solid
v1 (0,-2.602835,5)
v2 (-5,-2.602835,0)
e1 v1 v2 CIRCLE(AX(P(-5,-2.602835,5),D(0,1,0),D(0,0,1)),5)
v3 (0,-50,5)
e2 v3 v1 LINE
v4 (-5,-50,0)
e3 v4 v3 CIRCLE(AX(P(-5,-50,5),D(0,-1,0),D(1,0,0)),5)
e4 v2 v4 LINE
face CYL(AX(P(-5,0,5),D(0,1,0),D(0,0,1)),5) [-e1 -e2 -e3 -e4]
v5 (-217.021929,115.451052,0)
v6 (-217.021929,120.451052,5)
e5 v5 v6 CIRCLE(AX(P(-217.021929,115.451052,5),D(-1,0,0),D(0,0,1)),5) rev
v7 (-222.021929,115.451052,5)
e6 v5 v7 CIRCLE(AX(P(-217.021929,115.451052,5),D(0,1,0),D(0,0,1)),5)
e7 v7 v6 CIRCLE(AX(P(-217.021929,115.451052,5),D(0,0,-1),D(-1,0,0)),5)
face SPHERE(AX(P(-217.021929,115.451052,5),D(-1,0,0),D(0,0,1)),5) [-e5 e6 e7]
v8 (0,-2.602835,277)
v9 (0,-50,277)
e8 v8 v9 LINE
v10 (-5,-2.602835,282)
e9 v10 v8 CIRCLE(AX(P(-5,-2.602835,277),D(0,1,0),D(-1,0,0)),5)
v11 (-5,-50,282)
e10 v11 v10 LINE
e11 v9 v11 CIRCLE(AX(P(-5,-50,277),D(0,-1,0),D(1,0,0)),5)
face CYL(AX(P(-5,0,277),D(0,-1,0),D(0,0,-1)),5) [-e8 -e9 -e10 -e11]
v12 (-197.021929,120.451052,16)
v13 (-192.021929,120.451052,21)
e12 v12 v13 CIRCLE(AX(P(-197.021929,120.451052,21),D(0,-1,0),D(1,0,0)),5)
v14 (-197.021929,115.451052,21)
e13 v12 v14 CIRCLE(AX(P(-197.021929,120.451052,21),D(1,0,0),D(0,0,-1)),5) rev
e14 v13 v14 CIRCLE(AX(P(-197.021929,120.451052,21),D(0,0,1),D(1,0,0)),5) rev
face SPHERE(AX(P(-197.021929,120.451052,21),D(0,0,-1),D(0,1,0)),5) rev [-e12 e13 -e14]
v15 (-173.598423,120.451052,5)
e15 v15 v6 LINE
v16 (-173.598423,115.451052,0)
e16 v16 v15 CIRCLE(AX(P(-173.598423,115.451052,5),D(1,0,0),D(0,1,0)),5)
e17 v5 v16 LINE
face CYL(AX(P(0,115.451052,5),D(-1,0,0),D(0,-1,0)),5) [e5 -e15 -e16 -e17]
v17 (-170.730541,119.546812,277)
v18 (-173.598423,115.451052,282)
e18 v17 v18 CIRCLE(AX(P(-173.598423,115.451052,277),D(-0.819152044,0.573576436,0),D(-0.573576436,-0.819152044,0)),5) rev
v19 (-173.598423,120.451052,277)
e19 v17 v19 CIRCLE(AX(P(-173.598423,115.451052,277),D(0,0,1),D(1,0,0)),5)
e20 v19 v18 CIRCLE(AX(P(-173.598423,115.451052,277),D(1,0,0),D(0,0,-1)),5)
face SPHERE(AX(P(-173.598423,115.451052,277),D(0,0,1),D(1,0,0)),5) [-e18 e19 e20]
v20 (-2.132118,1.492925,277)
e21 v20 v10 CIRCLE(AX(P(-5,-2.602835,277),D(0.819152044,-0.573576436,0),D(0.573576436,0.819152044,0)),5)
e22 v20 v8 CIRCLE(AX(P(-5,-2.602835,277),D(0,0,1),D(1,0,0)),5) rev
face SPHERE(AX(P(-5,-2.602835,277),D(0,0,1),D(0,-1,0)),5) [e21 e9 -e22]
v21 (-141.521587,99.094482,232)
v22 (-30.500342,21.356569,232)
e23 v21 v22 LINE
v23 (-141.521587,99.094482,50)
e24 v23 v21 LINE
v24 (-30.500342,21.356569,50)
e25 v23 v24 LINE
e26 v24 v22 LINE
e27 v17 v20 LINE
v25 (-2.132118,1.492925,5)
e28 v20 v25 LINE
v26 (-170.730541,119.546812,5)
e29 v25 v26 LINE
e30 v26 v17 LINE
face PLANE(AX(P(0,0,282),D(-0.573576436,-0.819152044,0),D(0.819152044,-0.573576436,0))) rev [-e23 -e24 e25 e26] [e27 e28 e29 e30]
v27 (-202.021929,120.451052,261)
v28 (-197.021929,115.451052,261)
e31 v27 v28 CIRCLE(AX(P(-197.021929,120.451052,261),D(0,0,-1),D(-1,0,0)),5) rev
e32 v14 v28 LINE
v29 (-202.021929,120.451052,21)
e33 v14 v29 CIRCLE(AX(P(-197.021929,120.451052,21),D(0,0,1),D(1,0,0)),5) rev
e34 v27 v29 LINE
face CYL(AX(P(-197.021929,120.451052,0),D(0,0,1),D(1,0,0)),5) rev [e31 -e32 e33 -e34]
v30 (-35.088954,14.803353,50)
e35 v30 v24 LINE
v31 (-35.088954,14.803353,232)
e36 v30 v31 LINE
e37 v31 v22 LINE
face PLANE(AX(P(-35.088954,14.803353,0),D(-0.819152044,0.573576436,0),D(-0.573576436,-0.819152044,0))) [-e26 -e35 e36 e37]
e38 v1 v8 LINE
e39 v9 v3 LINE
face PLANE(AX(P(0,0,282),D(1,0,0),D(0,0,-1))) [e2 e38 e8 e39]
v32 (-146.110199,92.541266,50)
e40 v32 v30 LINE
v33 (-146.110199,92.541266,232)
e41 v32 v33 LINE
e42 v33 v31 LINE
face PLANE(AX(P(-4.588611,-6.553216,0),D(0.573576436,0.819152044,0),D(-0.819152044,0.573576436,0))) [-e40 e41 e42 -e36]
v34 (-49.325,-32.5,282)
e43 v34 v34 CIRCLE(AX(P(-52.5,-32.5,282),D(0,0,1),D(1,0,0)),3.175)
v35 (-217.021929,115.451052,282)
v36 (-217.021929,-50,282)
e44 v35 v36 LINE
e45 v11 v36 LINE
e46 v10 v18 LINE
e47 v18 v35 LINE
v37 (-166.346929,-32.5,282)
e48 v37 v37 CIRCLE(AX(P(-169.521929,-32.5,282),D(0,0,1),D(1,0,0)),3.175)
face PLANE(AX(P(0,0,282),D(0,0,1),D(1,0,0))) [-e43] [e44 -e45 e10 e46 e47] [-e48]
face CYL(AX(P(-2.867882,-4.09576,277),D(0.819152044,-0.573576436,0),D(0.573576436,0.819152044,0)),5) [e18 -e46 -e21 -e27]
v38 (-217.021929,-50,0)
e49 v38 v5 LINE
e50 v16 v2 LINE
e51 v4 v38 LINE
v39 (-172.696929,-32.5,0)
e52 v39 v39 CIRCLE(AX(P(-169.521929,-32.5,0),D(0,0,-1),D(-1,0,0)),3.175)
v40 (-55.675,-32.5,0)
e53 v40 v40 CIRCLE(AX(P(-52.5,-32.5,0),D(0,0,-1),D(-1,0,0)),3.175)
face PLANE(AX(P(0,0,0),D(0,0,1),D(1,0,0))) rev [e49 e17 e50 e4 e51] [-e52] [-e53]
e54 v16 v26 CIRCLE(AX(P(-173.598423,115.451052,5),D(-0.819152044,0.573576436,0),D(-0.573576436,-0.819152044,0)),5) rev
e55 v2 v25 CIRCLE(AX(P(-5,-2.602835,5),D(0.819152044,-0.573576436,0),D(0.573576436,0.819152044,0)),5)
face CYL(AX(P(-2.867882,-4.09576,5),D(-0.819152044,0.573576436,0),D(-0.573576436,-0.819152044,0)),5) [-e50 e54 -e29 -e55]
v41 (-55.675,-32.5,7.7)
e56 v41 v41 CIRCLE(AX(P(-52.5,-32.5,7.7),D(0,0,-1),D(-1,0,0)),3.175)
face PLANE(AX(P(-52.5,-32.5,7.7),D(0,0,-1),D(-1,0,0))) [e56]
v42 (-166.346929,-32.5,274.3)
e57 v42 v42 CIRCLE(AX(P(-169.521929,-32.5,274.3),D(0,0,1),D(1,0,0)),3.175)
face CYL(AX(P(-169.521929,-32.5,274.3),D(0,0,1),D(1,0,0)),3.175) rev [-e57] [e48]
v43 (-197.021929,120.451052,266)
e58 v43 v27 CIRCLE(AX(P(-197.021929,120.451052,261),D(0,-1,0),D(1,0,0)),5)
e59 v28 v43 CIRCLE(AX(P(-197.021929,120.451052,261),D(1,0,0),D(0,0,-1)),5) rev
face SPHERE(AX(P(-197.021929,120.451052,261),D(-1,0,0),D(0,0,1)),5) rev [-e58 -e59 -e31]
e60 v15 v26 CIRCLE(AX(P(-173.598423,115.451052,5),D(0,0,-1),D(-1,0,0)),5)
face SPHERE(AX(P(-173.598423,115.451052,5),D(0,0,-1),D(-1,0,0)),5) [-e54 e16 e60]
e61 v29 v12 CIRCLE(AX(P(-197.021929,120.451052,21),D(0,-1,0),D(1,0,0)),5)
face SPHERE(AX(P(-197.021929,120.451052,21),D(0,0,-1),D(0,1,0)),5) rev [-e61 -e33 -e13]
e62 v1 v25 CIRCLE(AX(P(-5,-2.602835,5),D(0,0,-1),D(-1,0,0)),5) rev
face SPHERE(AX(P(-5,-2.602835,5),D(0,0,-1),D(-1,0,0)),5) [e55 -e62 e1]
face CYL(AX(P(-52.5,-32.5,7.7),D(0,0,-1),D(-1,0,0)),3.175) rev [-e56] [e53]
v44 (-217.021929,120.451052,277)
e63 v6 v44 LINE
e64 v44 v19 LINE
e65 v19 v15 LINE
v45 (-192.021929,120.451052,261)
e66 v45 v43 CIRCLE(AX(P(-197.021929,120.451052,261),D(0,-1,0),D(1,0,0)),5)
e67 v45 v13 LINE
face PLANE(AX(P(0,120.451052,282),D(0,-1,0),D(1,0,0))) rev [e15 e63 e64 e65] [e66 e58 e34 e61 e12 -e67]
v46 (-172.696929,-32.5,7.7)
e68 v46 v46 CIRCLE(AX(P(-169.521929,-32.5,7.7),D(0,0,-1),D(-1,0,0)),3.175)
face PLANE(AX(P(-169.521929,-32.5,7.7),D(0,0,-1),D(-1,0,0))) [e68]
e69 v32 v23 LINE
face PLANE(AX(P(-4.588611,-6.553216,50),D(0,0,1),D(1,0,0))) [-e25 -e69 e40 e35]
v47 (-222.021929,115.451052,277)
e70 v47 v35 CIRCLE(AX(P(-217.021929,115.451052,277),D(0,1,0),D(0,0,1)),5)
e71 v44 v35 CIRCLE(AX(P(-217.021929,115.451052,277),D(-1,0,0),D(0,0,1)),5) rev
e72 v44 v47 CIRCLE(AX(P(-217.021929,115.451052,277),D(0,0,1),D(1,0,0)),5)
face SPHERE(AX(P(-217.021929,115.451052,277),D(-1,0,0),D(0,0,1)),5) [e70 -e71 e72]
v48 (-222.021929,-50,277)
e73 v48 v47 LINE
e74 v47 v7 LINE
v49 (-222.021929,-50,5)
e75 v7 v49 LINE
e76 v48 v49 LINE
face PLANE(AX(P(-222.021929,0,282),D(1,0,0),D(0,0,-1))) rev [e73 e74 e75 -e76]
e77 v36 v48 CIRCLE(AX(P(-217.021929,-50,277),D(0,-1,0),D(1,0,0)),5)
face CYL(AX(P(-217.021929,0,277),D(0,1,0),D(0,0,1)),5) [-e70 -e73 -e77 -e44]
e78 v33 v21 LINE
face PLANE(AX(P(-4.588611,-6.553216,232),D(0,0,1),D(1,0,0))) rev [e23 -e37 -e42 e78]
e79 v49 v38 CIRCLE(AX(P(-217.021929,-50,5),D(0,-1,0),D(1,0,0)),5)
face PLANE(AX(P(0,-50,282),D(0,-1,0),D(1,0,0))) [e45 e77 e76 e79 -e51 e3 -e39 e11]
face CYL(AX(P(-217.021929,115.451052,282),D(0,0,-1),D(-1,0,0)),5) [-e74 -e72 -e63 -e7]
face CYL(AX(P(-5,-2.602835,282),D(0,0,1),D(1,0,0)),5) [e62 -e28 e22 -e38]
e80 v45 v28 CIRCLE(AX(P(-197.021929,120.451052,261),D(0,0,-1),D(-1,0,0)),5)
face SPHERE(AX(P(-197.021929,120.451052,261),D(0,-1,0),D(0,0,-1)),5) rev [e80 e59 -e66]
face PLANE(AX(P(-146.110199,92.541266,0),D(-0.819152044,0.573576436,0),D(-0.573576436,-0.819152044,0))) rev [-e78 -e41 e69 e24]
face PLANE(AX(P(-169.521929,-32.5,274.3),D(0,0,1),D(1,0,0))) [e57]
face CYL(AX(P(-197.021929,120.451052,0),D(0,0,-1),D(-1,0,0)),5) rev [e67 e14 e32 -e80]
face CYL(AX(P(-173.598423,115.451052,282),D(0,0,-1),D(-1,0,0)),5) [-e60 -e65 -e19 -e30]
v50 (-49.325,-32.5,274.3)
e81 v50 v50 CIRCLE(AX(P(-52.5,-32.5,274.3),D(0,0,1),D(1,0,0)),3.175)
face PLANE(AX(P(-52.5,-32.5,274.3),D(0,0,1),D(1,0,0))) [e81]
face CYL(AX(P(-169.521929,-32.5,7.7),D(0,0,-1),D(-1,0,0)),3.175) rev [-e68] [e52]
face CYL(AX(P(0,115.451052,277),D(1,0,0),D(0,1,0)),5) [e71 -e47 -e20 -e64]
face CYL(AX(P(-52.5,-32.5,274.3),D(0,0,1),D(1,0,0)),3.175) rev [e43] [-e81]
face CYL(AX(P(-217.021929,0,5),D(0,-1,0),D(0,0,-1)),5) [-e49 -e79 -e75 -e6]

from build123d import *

# Parameters (mm, degrees)
SKETCH1_W           = 50
SKETCH1_H           = 170.451051634
BOSS_EXTRUDE1_DEPTH = 282
CUT_EXTRUDE1_DEPTH  = 8
CUT_EXTRUDE2_DEPTH  = 5
FILLET3_R           = 5
SKETCH5_R           = 3.175
CUT_EXTRUDE3_DEPTH  = 7.7
CUT_EXTRUDE4_START  = -7.7
SKETCH6_R           = 3.175
CUT_EXTRUDE4_DEPTH  = 7.7
FILLET4_R           = 5


with BuildPart() as part:
    # Sketch1 → Boss-Extrude1 (new body)
    with BuildSketch(Plane.XY):
        with Locations((-197.021929301, 35.225525817)):
            Rectangle(SKETCH1_W, SKETCH1_H)
        Polygon((0, -50), (0, 0), (-172.021929301, 120.451051634), (-172.021929301, -50), align=None)
    extrude(amount=BOSS_EXTRUDE1_DEPTH)

    # Sketch3 → Cut-Extrude1 (cut)
    with BuildSketch(Plane(origin=(0, 0, 0), x_dir=(0.819152044288989, -0.5735764363510502, 0), z_dir=(0.5735764363510502, 0.819152044288989, 0))):
        Polygon((-37.234042553, -232), (-172.765957447, -50), (-172.765957447, -232), align=None)
        Polygon((-37.234042553, -50), (-172.765957447, -50), (-37.234042553, -232), align=None)
    extrude(amount=-CUT_EXTRUDE1_DEPTH, mode=Mode.SUBTRACT)

    # Sketch4 → Cut-Extrude2 (cut)
    with BuildSketch(Plane(origin=(0, 120.451051634, 0), x_dir=(1, 0, 0), z_dir=(0, 1, 0))):
        Polygon((-202.021929301, -112.8), (-192.021929301, -169.2), (-192.021929301, -16), (-202.021929301, -16), align=None)
        Polygon((-192.021929301, -266), (-192.021929301, -169.2), (-202.021929301, -112.8), (-202.021929301, -266), align=None)
    extrude(amount=-CUT_EXTRUDE2_DEPTH, mode=Mode.SUBTRACT)

    # Fillet3
    # the kernel refuses this fillet: 5 mm, written as the material it adds along each edge
    with BuildSketch(Plane(origin=(-197.021929301, 120.451051634, 261), x_dir=(0, 0, 1), z_dir=(0, -1, 0))) as fillet3_piece_1_section:
        Polygon((0, 0), (FILLET3_R * 1.02, 0), (FILLET3_R * 1.02, FILLET3_R * 1.02), (0, FILLET3_R * 1.02), align=None)
    fillet3_piece_1 = extrude(amount=FILLET3_R * 1.02, mode=Mode.PRIVATE)
    fillet3_piece_1 = fillet3_piece_1 - Plane(origin=(-197.021929301, 120.451051634, 261), x_dir=(0.7071067811865475, 0, -0.7071067811865475), z_dir=(0, -1, 0)) * Sphere(FILLET3_R, mode=Mode.PRIVATE)
    with BuildSketch(Plane(origin=(-197.021929301, 120.451051634, 21), x_dir=(0, -1, 0), z_dir=(0, 0, -1))) as fillet3_piece_2_section:
        Polygon((0, 0), (FILLET3_R * 1.02, 0), (FILLET3_R * 1.02, FILLET3_R * 1.02), (0, FILLET3_R * 1.02), align=None)
    fillet3_piece_2 = extrude(amount=FILLET3_R * 1.02, mode=Mode.PRIVATE)
    fillet3_piece_2 = fillet3_piece_2 - Plane(origin=(-197.021929301, 120.451051634, 21), x_dir=(0.7071067811865474, 0.7071067811865478, 0), z_dir=(0, 0, -1)) * Sphere(FILLET3_R, mode=Mode.PRIVATE)
    with BuildSketch(Plane(origin=(-197.021929301, 120.451051634, 261), x_dir=(0, 0, 1), z_dir=(1, 0, 0))) as fillet3_piece_3_section:
        Polygon((0, 0), (FILLET3_R * 1.02, 0), (FILLET3_R * 1.02, FILLET3_R * 1.02), (0, FILLET3_R * 1.02), align=None)
    fillet3_piece_3 = extrude(amount=FILLET3_R * 1.02, mode=Mode.PRIVATE)
    fillet3_piece_3 = fillet3_piece_3 - Plane(origin=(-197.021929301, 120.451051634, 261), x_dir=(0, 0.7071067811865475, -0.7071067811865475), z_dir=(1, 0, 0)) * Sphere(FILLET3_R, mode=Mode.PRIVATE)
    with BuildSketch(Plane(origin=(-197.021929301, 120.451051634, 21), x_dir=(1, 0, 0), z_dir=(0, 0, -1))) as fillet3_piece_4_section:
        Polygon((0, 0), (FILLET3_R * 1.02, 0), (FILLET3_R * 1.02, FILLET3_R * 1.02), (0, FILLET3_R * 1.02), align=None)
    fillet3_piece_4 = extrude(amount=FILLET3_R * 1.02, mode=Mode.PRIVATE)
    fillet3_piece_4 = fillet3_piece_4 - Plane(origin=(-197.021929301, 120.451051634, 21), x_dir=(-0.7071067811865478, 0.7071067811865474, 0), z_dir=(0, 0, -1)) * Sphere(FILLET3_R, mode=Mode.PRIVATE)
    with BuildSketch(Plane(origin=(-192.021929301, 115.451051634, 261), x_dir=(0, 1, 0), z_dir=(0, 0, -1))) as fillet3_piece_5:
        with BuildLine():
            CenterArc((FILLET3_R, -FILLET3_R), FILLET3_R, 90, 90)
            Line((0, -FILLET3_R), (0, 0))
            Line((0, 0), (FILLET3_R, 0))
        make_face()
    fillet3_piece_5_solid = extrude(amount=240, mode=Mode.PRIVATE)
    with BuildSketch(Plane(origin=(-202.021929301, 115.451051634, 261), x_dir=(0, 1, 0), z_dir=(0, 0, -1))) as fillet3_piece_6:
        with BuildLine():
            CenterArc((FILLET3_R, FILLET3_R), FILLET3_R, 180, 90)
            Line((0, FILLET3_R), (0, 0))
            Line((0, 0), (FILLET3_R, 0))
        make_face()
    fillet3_piece_6_solid = extrude(amount=240, mode=Mode.PRIVATE)
    add([fillet3_piece_1, fillet3_piece_2, fillet3_piece_3, fillet3_piece_4, fillet3_piece_5_solid, fillet3_piece_6_solid])

    # Sketch5 → Cut-Extrude3 (cut)
    with BuildSketch(Plane.XY.offset(282)):
        with Locations((-52.5, -32.5)):
            Circle(SKETCH5_R)
        with Locations((-169.521929301, -32.5)):
            Circle(SKETCH5_R)
    extrude(amount=-CUT_EXTRUDE3_DEPTH, mode=Mode.SUBTRACT)

    # Sketch6 → Cut-Extrude4 (cut)
    with BuildSketch(Plane(origin=(0, 0, 0), x_dir=(-1, 0, 0), z_dir=(0, 0, -1)).offset(CUT_EXTRUDE4_START)):
        with Locations(Location((169.521929301, -32.5, 0), (0, 0, 180))):
            Circle(SKETCH6_R)
        with Locations(Location((52.5, -32.5, 0), (0, 0, 180))):
            Circle(SKETCH6_R)
    extrude(amount=CUT_EXTRUDE4_DEPTH, mode=Mode.SUBTRACT)

    # Fillet4
    fillet4_edges = [part.edges().sort_by_distance(p)[0] for p in [
        (-222.021929301, 35.225525817, 282),
        (-172.021929301, 120.451051634, 141),
        (0, 0, 141),
        (-222.021929301, 120.451051634, 141),
        (0, -25, 282),
        (-86.01096465, 60.225525817, 282),
        (-197.021929301, 120.451051634, 282),
        (-86.01096465, 60.225525817, 0),
        (0, -25, 0),
        (-222.021929301, 35.225525817, 0),
        (-197.021929301, 120.451051634, 0),
    ]]
    fillet(fillet4_edges, radius=FILLET4_R)


solid = part.part
